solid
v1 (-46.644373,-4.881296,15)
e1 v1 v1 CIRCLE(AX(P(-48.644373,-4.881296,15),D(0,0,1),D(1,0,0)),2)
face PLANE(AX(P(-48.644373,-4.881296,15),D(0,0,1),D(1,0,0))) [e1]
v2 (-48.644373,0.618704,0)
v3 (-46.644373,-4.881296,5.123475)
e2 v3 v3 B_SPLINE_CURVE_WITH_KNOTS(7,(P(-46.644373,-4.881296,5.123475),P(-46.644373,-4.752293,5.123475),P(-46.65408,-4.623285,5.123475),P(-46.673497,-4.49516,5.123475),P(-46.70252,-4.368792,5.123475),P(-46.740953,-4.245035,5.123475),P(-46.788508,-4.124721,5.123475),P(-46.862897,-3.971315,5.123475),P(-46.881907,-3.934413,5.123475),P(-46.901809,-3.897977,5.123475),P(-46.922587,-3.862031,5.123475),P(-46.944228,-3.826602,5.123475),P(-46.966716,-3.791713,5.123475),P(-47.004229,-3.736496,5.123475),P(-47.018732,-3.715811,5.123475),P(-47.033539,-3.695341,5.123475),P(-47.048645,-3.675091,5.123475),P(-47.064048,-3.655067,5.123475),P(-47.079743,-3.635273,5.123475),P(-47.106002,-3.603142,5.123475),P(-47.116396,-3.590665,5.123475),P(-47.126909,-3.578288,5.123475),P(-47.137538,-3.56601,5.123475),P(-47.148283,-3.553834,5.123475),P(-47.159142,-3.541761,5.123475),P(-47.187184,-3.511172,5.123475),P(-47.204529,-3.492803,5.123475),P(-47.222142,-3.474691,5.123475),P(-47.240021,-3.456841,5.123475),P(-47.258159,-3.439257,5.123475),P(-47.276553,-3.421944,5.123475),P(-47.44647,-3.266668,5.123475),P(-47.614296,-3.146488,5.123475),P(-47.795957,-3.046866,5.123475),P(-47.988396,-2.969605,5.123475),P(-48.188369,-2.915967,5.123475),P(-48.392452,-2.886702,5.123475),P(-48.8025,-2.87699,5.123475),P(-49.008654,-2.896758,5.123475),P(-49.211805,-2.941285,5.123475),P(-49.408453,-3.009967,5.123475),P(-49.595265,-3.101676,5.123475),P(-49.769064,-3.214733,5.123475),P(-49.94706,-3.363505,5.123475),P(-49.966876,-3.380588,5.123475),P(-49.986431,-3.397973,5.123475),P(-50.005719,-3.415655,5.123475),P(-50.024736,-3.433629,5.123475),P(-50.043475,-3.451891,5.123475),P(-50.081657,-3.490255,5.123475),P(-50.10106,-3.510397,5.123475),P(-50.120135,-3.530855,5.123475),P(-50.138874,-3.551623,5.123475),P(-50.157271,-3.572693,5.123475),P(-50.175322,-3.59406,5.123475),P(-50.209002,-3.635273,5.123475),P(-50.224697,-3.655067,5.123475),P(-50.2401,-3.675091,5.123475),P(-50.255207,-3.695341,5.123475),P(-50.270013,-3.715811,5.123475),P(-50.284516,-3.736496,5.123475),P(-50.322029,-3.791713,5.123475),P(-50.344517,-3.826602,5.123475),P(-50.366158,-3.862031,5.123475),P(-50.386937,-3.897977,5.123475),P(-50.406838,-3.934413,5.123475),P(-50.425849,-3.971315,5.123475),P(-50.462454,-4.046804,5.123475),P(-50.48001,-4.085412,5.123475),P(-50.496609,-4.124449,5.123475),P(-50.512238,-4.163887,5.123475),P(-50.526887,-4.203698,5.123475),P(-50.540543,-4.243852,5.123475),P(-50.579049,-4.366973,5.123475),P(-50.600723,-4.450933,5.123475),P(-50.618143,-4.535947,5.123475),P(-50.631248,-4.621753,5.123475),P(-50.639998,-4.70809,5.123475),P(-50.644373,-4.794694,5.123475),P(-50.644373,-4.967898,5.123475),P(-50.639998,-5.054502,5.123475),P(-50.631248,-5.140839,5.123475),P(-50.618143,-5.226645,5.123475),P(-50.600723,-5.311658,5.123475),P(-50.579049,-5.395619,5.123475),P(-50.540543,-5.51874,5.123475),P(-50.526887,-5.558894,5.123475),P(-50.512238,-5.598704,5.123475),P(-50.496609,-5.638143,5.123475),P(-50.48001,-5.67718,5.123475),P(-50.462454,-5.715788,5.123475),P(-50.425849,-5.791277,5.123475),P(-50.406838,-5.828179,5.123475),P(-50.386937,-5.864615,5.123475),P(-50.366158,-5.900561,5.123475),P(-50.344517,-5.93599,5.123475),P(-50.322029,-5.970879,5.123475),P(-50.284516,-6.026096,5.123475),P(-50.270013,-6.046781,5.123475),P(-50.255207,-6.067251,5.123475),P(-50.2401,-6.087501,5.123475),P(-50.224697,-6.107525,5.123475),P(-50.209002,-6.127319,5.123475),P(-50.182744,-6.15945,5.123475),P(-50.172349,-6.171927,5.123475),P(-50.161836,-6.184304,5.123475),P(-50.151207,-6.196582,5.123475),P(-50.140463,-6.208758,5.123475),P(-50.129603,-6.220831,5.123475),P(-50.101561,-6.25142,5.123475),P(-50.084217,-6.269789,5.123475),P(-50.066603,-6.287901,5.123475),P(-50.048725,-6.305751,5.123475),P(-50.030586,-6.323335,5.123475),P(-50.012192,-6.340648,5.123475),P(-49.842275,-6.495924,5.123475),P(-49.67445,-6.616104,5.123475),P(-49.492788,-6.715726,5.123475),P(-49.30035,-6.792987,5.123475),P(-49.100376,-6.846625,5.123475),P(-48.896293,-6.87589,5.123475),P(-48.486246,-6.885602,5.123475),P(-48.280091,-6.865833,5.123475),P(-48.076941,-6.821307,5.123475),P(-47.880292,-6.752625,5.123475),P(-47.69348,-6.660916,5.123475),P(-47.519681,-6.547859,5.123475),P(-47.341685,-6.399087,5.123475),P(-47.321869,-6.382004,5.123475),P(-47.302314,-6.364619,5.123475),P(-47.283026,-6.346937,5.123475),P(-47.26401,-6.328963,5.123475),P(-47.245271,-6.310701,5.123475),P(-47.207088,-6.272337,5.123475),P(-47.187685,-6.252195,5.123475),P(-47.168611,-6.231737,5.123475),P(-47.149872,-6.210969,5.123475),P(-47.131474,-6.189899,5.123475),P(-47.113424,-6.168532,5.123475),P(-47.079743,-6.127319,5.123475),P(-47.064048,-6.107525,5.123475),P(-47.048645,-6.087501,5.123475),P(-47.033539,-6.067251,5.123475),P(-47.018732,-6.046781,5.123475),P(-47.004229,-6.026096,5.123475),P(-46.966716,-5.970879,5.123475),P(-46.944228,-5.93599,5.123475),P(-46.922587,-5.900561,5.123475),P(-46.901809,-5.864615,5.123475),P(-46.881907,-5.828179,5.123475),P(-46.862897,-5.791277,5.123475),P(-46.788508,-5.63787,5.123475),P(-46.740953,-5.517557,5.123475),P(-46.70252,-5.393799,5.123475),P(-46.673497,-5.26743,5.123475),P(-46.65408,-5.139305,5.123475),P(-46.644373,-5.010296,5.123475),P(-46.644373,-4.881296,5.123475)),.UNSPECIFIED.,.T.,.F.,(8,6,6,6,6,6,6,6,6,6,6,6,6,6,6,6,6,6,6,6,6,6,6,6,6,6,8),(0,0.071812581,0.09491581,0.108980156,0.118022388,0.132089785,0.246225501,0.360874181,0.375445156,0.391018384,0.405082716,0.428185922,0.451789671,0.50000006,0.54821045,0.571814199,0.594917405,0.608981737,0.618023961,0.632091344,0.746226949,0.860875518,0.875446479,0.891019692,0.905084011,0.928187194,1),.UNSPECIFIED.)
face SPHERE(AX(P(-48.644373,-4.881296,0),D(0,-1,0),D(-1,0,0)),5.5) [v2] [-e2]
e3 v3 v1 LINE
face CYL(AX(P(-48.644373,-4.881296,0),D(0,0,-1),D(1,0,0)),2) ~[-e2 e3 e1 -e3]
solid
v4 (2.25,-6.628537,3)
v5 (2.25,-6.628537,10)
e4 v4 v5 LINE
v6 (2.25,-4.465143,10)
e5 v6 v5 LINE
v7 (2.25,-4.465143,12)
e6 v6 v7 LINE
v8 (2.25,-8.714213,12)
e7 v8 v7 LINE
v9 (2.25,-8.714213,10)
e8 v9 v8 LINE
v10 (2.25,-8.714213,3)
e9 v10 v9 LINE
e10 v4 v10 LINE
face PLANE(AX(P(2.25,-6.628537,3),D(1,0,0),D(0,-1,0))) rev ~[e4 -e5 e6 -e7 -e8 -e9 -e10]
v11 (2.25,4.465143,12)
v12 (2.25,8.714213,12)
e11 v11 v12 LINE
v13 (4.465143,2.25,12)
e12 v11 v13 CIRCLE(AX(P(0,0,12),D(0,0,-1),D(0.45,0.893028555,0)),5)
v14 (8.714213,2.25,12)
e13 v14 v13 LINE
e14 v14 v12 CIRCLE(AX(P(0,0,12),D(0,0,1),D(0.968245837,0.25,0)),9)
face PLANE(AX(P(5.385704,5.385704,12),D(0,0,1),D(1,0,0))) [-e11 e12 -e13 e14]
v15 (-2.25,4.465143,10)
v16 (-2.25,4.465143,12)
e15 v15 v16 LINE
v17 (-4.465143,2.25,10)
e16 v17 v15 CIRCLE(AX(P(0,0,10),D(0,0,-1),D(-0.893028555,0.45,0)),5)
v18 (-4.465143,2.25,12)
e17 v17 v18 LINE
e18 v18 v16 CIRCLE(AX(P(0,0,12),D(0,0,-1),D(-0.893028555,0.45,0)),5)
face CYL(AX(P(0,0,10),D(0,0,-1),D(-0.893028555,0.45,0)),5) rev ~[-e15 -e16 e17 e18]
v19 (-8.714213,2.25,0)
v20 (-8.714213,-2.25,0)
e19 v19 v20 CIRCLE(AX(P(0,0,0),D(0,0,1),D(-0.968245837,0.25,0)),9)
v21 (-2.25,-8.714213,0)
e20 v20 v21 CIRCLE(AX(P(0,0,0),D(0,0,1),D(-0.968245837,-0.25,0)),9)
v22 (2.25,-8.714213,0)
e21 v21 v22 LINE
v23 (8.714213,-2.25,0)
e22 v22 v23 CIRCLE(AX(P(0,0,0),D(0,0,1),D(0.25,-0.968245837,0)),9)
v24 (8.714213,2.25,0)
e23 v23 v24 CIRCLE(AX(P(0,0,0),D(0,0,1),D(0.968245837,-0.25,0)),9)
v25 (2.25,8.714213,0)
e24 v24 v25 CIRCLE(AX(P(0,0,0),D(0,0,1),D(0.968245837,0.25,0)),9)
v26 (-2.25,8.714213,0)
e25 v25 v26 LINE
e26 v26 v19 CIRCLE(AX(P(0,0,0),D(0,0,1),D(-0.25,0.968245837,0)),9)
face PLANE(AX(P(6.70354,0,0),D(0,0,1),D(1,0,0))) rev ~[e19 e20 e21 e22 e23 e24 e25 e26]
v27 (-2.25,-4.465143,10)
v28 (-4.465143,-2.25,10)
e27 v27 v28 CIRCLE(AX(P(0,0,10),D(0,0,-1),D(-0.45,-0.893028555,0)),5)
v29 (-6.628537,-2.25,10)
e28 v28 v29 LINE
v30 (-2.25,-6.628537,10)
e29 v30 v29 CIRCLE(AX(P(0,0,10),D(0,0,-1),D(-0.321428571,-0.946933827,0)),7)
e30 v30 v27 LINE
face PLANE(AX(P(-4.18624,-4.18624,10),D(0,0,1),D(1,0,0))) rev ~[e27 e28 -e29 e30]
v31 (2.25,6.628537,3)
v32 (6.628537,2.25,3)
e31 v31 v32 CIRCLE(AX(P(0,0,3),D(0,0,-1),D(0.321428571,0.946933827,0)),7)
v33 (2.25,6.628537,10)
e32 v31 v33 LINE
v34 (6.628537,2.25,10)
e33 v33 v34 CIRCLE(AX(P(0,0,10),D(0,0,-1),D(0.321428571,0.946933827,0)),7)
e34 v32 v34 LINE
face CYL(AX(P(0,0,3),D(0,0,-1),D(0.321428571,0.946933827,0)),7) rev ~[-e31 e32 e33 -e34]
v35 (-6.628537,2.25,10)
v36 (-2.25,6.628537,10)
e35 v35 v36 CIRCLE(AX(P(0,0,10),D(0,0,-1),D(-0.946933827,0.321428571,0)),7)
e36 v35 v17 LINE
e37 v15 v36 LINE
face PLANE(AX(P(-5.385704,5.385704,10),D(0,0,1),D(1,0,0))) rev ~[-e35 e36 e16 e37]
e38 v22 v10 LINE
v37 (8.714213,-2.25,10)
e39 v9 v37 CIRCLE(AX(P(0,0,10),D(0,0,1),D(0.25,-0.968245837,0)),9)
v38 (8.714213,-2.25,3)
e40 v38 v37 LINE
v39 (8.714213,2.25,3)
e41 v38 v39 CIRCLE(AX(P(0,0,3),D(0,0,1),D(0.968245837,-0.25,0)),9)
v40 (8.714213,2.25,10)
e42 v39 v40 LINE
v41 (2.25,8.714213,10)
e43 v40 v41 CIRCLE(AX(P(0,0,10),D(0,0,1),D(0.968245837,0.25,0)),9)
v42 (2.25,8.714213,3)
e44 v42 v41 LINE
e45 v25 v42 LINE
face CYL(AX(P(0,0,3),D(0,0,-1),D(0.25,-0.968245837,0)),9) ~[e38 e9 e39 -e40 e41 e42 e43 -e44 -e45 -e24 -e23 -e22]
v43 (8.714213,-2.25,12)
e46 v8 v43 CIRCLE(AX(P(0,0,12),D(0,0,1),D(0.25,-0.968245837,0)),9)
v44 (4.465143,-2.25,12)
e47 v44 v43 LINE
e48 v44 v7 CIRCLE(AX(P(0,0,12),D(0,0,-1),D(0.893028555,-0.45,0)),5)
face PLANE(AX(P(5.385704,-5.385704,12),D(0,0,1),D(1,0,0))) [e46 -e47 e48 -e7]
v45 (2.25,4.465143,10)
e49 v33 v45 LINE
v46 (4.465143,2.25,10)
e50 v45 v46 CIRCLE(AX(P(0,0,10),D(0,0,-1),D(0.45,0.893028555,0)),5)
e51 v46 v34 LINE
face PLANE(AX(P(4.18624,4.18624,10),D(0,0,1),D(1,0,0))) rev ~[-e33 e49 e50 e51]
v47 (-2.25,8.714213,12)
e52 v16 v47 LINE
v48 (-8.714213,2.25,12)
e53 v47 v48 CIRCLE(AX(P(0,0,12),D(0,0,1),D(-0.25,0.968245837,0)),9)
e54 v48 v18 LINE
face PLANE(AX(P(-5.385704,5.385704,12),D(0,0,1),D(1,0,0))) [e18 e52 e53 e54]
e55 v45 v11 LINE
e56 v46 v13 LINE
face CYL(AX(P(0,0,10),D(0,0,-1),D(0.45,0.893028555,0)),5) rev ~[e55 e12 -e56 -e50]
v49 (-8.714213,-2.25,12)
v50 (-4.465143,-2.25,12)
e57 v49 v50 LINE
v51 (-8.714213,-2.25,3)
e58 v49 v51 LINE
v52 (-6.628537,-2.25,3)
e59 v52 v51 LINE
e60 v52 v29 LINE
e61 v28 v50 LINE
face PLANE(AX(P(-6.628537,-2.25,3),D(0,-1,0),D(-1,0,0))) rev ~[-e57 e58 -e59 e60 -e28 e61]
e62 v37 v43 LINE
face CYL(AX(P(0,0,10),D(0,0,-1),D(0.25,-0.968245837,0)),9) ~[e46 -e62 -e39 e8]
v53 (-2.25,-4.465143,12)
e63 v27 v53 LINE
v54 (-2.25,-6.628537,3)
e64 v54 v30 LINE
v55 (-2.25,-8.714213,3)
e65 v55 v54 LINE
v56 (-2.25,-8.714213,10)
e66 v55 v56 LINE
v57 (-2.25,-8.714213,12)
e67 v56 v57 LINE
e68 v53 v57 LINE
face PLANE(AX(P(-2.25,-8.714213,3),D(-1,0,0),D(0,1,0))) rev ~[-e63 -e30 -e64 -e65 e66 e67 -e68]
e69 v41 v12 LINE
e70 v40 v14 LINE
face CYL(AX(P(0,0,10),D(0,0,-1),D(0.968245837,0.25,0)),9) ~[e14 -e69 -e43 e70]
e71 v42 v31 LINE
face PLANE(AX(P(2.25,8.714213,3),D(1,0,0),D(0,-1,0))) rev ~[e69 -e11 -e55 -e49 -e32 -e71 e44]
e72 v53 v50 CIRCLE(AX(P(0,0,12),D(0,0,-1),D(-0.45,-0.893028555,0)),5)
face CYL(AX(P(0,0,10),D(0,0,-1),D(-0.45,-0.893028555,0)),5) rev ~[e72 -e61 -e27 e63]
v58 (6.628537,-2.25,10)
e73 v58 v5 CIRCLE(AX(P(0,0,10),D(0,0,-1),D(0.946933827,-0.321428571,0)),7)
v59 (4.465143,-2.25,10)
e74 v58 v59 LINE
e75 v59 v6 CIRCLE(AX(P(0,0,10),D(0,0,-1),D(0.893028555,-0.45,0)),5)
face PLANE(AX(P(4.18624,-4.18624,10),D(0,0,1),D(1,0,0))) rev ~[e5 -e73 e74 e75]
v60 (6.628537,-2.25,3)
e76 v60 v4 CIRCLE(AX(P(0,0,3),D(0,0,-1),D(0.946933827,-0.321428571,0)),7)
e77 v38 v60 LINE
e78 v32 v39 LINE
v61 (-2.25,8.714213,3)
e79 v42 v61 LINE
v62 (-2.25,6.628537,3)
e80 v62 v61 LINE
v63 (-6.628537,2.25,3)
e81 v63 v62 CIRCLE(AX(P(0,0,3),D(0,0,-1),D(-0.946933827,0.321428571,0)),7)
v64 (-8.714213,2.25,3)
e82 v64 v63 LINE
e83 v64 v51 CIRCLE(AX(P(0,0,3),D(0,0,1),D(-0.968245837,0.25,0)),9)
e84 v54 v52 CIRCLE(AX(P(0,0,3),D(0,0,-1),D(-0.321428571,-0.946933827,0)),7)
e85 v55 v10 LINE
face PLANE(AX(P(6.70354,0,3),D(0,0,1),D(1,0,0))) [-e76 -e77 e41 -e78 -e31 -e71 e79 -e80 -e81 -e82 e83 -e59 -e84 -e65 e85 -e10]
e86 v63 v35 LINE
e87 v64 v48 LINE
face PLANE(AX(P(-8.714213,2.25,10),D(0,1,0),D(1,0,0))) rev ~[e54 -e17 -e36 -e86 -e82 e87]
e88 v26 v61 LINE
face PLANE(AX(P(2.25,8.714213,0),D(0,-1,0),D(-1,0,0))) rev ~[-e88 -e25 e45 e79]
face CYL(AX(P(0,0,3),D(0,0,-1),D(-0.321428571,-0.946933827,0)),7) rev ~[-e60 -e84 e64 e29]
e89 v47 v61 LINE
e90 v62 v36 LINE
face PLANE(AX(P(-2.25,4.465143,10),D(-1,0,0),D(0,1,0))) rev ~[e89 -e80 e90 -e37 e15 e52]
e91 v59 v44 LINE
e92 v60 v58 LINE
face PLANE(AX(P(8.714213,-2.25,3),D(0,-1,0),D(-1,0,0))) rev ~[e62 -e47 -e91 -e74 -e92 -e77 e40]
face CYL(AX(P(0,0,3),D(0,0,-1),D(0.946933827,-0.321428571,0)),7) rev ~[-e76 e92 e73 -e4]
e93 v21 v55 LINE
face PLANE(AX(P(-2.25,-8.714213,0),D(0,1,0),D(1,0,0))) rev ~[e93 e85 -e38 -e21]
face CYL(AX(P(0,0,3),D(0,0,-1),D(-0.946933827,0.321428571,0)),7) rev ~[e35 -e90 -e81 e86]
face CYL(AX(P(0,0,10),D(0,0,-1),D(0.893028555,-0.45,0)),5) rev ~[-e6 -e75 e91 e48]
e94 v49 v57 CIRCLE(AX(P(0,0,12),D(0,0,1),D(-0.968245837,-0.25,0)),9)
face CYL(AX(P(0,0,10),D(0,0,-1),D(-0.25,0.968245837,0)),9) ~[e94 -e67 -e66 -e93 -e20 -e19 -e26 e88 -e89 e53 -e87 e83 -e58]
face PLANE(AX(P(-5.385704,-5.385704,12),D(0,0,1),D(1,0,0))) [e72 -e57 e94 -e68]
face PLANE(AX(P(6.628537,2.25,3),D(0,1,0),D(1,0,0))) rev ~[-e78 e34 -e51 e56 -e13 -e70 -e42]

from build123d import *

# Parameters (mm, degrees)
F3_R      = 2
F4_DEPTH  = 15
F6_DEPTH  = 3
F8_DEPTH  = 7
F10_DEPTH = 2


with BuildPart() as f2:
    # F1 (on Top) → F2 (revolve)
    with BuildSketch(Plane.XY):
        with BuildLine():
            Line((-48.6443726491, -10.3812959576), (-48.6443726491, 0.6187040424))
            ThreePointArc((-48.6443726491, 0.6187040424), (-54.1443726491, -4.8812959576), (-48.6443726491, -10.3812959576))
        make_face()
    revolve(axis=Axis((-48.6443726491, -4.8812959576, 0), (0, -1, 0)))

    # F3 (on Top) → F4 (join)
    with BuildSketch(Plane.XY):
        with Locations((-48.6443726491, -4.8812959576)):
            Circle(F3_R)
    extrude(amount=F4_DEPTH)


with BuildPart() as f6:
    # F5 (on Top) + F0 (on Top) → F6 (new body)
    with BuildSketch(Plane.XY):
        with BuildLine():
            ThreePointArc((-4.4651427749, 2.25), (-3.5355339059, 3.5355339059), (-2.25, 4.4651427749))
            Line((-2.25, 4.4651427749), (-2.25, 8.714212529))
            ThreePointArc((-2.25, 8.714212529), (-6.3639610307, 6.3639610307), (-8.714212529, 2.25))
            Line((-8.714212529, 2.25), (-4.4651427749, 2.25))
        make_face()
        with BuildLine():
            ThreePointArc((-2.25, -4.4651427749), (-3.5355339059, -3.5355339059), (-4.4651427749, -2.25))
            Line((-4.4651427749, -2.25), (-8.714212529, -2.25))
            ThreePointArc((-8.714212529, -2.25), (-6.3639610307, -6.3639610307), (-2.25, -8.714212529))
            Line((-2.25, -8.714212529), (-2.25, -4.4651427749))
        make_face()
        with BuildLine():
            ThreePointArc((2.25, -8.714212529), (6.3639610307, -6.3639610307), (8.714212529, -2.25))
            Line((8.714212529, -2.25), (4.4651427749, -2.25))
            ThreePointArc((4.4651427749, -2.25), (3.5355339059, -3.5355339059), (2.25, -4.4651427749))
            Line((2.25, -4.4651427749), (2.25, -8.714212529))
        make_face()
        with BuildLine():
            Line((-2.25, 8.714212529), (-2.25, 4.4651427749))
            ThreePointArc((-2.25, 4.4651427749), (-3.5355339059, 3.5355339059), (-4.4651427749, 2.25))
            ThreePointArc((-4.4651427749, 2.25), (-5, 0), (-4.4651427749, -2.25))
            ThreePointArc((-4.4651427749, -2.25), (-3.5355339059, -3.5355339059), (-2.25, -4.4651427749))
            Line((-2.25, -4.4651427749), (-2.25, -8.714212529))
            Line((-2.25, -8.714212529), (2.25, -8.714212529))
            Line((2.25, -8.714212529), (2.25, -4.4651427749))
            ThreePointArc((2.25, -4.4651427749), (3.5355339059, -3.5355339059), (4.4651427749, -2.25))
            ThreePointArc((4.4651427749, -2.25), (5, 0), (4.4651427749, 2.25))
            ThreePointArc((4.4651427749, 2.25), (3.5355339059, 3.5355339059), (2.25, 4.4651427749))
            Line((2.25, 4.4651427749), (2.25, 8.714212529))
            Line((2.25, 8.714212529), (-2.25, 8.714212529))
        make_face()
    with BuildSketch(Plane.XY):
        with BuildLine():
            ThreePointArc((-4.4651427749, -2.25), (-5, 0), (-4.4651427749, 2.25))
            Line((-4.4651427749, 2.25), (-8.714212529, 2.25))
            ThreePointArc((-8.714212529, 2.25), (-9, 0), (-8.714212529, -2.25))
            Line((-8.714212529, -2.25), (-4.4651427749, -2.25))
        make_face()
        with BuildLine():
            ThreePointArc((8.714212529, -2.25), (9, 0), (8.714212529, 2.25))
            Line((8.714212529, 2.25), (4.4651427749, 2.25))
            ThreePointArc((4.4651427749, 2.25), (5, 0), (4.4651427749, -2.25))
            Line((4.4651427749, -2.25), (8.714212529, -2.25))
        make_face()
        with BuildLine():
            ThreePointArc((8.714212529, 2.25), (6.3639610307, 6.3639610307), (2.25, 8.714212529))
            Line((2.25, 8.714212529), (2.25, 4.4651427749))
            ThreePointArc((2.25, 4.4651427749), (3.5355339059, 3.5355339059), (4.4651427749, 2.25))
            Line((4.4651427749, 2.25), (8.714212529, 2.25))
        make_face()
    extrude(amount=F6_DEPTH)

    # F7 (on face) → F8 (join)
    with BuildSketch(Plane.XY.offset(3)):
        with BuildLine():
            ThreePointArc((-6.6285367918, 2.25), (-4.9497474683, 4.9497474683), (-2.25, 6.6285367918))
            Line((-2.25, 6.6285367918), (-2.25, 8.714212529))
            ThreePointArc((-2.25, 8.714212529), (-6.3639610307, 6.3639610307), (-8.714212529, 2.25))
            Line((-8.714212529, 2.25), (-6.6285367918, 2.25))
        make_face()
        with BuildLine():
            ThreePointArc((8.714212529, 2.25), (6.3639610307, 6.3639610307), (2.25, 8.714212529))
            Line((2.25, 8.714212529), (2.25, 6.6285367918))
            ThreePointArc((2.25, 6.6285367918), (4.9497474683, 4.9497474683), (6.6285367918, 2.25))
            Line((6.6285367918, 2.25), (8.714212529, 2.25))
        make_face()
        with BuildLine():
            ThreePointArc((2.25, -8.714212529), (6.3639610307, -6.3639610307), (8.714212529, -2.25))
            Line((8.714212529, -2.25), (6.6285367918, -2.25))
            ThreePointArc((6.6285367918, -2.25), (4.9497474683, -4.9497474683), (2.25, -6.6285367918))
            Line((2.25, -6.6285367918), (2.25, -8.714212529))
        make_face()
        with BuildLine():
            ThreePointArc((-2.25, -6.6285367918), (-4.9497474683, -4.9497474683), (-6.6285367918, -2.25))
            Line((-6.6285367918, -2.25), (-8.714212529, -2.25))
            ThreePointArc((-8.714212529, -2.25), (-6.3639610307, -6.3639610307), (-2.25, -8.714212529))
            Line((-2.25, -8.714212529), (-2.25, -6.6285367918))
        make_face()
    extrude(amount=F8_DEPTH)

    # F9 (on face) + F8_face (on face) → F10 (join)
    with BuildSketch(Plane.XY.offset(10)):
        with BuildLine():
            ThreePointArc((-6.6285367918, 2.25), (-4.9497474683, 4.9497474683), (-2.25, 6.6285367918))
            Line((-2.25, 6.6285367918), (-2.25, 8.714212529))
            ThreePointArc((-2.25, 8.714212529), (-6.3639610307, 6.3639610307), (-8.714212529, 2.25))
            Line((-8.714212529, 2.25), (-6.6285367918, 2.25))
        make_face()
        with BuildLine():
            ThreePointArc((-4.4651427749, 2.25), (-3.5355339059, 3.5355339059), (-2.25, 4.4651427749))
            Line((-2.25, 4.4651427749), (-2.25, 6.6285367918))
            ThreePointArc((-2.25, 6.6285367918), (-4.9497474683, 4.9497474683), (-6.6285367918, 2.25))
            Line((-6.6285367918, 2.25), (-4.4651427749, 2.25))
        make_face()
        with BuildLine():
            ThreePointArc((6.6285367918, 2.25), (4.9497474683, 4.9497474683), (2.25, 6.6285367918))
            Line((2.25, 6.6285367918), (2.25, 4.4651427749))
            ThreePointArc((2.25, 4.4651427749), (3.5355339059, 3.5355339059), (4.4651427749, 2.25))
            Line((4.4651427749, 2.25), (6.6285367918, 2.25))
        make_face()
        with BuildLine():
            Line((2.25, -4.4651427749), (2.25, -6.6285367918))
            ThreePointArc((2.25, -6.6285367918), (4.9497474683, -4.9497474683), (6.6285367918, -2.25))
            Line((6.6285367918, -2.25), (4.4651427749, -2.25))
            ThreePointArc((4.4651427749, -2.25), (3.5355339059, -3.5355339059), (2.25, -4.4651427749))
        make_face()
        with BuildLine():
            ThreePointArc((-2.25, -4.4651427749), (-3.5355339059, -3.5355339059), (-4.4651427749, -2.25))
            Line((-4.4651427749, -2.25), (-6.6285367918, -2.25))
            ThreePointArc((-6.6285367918, -2.25), (-4.9497474683, -4.9497474683), (-2.25, -6.6285367918))
            Line((-2.25, -6.6285367918), (-2.25, -4.4651427749))
        make_face()
    with BuildSketch(Plane(origin=(-5.466060035, 5.466060035, 10), x_dir=(1, 0, 0), z_dir=(0, 0, 1))):
        with BuildLine():
            Line((12.0945968267, -3.216060035), (14.1802725639, -3.216060035))
            ThreePointArc((14.1802725639, -3.216060035), (11.8300210656, 0.8979009957), (7.716060035, 3.248152494))
            Line((7.716060035, 3.248152494), (7.716060035, 1.1624767568))
            ThreePointArc((7.716060035, 1.1624767568), (10.4158075033, -0.5163125667), (12.0945968267, -3.216060035))
        make_face()
        with BuildLine():
            ThreePointArc((12.0945968267, -7.716060035), (10.4158075033, -10.4158075033), (7.716060035, -12.0945968267))
            Line((7.716060035, -12.0945968267), (7.716060035, -14.1802725639))
            ThreePointArc((7.716060035, -14.1802725639), (11.8300210656, -11.8300210656), (14.1802725639, -7.716060035))
            Line((14.1802725639, -7.716060035), (12.0945968267, -7.716060035))
        make_face()
        with BuildLine():
            Line((3.216060035, -14.1802725639), (3.216060035, -12.0945968267))
            ThreePointArc((3.216060035, -12.0945968267), (0.5163125667, -10.4158075033), (-1.1624767568, -7.716060035))
            Line((-1.1624767568, -7.716060035), (-3.248152494, -7.716060035))
            ThreePointArc((-3.248152494, -7.716060035), (-0.8979009957, -11.8300210656), (3.216060035, -14.1802725639))
        make_face()
    extrude(amount=F10_DEPTH)


solid = Compound([f2.part, f6.part])
